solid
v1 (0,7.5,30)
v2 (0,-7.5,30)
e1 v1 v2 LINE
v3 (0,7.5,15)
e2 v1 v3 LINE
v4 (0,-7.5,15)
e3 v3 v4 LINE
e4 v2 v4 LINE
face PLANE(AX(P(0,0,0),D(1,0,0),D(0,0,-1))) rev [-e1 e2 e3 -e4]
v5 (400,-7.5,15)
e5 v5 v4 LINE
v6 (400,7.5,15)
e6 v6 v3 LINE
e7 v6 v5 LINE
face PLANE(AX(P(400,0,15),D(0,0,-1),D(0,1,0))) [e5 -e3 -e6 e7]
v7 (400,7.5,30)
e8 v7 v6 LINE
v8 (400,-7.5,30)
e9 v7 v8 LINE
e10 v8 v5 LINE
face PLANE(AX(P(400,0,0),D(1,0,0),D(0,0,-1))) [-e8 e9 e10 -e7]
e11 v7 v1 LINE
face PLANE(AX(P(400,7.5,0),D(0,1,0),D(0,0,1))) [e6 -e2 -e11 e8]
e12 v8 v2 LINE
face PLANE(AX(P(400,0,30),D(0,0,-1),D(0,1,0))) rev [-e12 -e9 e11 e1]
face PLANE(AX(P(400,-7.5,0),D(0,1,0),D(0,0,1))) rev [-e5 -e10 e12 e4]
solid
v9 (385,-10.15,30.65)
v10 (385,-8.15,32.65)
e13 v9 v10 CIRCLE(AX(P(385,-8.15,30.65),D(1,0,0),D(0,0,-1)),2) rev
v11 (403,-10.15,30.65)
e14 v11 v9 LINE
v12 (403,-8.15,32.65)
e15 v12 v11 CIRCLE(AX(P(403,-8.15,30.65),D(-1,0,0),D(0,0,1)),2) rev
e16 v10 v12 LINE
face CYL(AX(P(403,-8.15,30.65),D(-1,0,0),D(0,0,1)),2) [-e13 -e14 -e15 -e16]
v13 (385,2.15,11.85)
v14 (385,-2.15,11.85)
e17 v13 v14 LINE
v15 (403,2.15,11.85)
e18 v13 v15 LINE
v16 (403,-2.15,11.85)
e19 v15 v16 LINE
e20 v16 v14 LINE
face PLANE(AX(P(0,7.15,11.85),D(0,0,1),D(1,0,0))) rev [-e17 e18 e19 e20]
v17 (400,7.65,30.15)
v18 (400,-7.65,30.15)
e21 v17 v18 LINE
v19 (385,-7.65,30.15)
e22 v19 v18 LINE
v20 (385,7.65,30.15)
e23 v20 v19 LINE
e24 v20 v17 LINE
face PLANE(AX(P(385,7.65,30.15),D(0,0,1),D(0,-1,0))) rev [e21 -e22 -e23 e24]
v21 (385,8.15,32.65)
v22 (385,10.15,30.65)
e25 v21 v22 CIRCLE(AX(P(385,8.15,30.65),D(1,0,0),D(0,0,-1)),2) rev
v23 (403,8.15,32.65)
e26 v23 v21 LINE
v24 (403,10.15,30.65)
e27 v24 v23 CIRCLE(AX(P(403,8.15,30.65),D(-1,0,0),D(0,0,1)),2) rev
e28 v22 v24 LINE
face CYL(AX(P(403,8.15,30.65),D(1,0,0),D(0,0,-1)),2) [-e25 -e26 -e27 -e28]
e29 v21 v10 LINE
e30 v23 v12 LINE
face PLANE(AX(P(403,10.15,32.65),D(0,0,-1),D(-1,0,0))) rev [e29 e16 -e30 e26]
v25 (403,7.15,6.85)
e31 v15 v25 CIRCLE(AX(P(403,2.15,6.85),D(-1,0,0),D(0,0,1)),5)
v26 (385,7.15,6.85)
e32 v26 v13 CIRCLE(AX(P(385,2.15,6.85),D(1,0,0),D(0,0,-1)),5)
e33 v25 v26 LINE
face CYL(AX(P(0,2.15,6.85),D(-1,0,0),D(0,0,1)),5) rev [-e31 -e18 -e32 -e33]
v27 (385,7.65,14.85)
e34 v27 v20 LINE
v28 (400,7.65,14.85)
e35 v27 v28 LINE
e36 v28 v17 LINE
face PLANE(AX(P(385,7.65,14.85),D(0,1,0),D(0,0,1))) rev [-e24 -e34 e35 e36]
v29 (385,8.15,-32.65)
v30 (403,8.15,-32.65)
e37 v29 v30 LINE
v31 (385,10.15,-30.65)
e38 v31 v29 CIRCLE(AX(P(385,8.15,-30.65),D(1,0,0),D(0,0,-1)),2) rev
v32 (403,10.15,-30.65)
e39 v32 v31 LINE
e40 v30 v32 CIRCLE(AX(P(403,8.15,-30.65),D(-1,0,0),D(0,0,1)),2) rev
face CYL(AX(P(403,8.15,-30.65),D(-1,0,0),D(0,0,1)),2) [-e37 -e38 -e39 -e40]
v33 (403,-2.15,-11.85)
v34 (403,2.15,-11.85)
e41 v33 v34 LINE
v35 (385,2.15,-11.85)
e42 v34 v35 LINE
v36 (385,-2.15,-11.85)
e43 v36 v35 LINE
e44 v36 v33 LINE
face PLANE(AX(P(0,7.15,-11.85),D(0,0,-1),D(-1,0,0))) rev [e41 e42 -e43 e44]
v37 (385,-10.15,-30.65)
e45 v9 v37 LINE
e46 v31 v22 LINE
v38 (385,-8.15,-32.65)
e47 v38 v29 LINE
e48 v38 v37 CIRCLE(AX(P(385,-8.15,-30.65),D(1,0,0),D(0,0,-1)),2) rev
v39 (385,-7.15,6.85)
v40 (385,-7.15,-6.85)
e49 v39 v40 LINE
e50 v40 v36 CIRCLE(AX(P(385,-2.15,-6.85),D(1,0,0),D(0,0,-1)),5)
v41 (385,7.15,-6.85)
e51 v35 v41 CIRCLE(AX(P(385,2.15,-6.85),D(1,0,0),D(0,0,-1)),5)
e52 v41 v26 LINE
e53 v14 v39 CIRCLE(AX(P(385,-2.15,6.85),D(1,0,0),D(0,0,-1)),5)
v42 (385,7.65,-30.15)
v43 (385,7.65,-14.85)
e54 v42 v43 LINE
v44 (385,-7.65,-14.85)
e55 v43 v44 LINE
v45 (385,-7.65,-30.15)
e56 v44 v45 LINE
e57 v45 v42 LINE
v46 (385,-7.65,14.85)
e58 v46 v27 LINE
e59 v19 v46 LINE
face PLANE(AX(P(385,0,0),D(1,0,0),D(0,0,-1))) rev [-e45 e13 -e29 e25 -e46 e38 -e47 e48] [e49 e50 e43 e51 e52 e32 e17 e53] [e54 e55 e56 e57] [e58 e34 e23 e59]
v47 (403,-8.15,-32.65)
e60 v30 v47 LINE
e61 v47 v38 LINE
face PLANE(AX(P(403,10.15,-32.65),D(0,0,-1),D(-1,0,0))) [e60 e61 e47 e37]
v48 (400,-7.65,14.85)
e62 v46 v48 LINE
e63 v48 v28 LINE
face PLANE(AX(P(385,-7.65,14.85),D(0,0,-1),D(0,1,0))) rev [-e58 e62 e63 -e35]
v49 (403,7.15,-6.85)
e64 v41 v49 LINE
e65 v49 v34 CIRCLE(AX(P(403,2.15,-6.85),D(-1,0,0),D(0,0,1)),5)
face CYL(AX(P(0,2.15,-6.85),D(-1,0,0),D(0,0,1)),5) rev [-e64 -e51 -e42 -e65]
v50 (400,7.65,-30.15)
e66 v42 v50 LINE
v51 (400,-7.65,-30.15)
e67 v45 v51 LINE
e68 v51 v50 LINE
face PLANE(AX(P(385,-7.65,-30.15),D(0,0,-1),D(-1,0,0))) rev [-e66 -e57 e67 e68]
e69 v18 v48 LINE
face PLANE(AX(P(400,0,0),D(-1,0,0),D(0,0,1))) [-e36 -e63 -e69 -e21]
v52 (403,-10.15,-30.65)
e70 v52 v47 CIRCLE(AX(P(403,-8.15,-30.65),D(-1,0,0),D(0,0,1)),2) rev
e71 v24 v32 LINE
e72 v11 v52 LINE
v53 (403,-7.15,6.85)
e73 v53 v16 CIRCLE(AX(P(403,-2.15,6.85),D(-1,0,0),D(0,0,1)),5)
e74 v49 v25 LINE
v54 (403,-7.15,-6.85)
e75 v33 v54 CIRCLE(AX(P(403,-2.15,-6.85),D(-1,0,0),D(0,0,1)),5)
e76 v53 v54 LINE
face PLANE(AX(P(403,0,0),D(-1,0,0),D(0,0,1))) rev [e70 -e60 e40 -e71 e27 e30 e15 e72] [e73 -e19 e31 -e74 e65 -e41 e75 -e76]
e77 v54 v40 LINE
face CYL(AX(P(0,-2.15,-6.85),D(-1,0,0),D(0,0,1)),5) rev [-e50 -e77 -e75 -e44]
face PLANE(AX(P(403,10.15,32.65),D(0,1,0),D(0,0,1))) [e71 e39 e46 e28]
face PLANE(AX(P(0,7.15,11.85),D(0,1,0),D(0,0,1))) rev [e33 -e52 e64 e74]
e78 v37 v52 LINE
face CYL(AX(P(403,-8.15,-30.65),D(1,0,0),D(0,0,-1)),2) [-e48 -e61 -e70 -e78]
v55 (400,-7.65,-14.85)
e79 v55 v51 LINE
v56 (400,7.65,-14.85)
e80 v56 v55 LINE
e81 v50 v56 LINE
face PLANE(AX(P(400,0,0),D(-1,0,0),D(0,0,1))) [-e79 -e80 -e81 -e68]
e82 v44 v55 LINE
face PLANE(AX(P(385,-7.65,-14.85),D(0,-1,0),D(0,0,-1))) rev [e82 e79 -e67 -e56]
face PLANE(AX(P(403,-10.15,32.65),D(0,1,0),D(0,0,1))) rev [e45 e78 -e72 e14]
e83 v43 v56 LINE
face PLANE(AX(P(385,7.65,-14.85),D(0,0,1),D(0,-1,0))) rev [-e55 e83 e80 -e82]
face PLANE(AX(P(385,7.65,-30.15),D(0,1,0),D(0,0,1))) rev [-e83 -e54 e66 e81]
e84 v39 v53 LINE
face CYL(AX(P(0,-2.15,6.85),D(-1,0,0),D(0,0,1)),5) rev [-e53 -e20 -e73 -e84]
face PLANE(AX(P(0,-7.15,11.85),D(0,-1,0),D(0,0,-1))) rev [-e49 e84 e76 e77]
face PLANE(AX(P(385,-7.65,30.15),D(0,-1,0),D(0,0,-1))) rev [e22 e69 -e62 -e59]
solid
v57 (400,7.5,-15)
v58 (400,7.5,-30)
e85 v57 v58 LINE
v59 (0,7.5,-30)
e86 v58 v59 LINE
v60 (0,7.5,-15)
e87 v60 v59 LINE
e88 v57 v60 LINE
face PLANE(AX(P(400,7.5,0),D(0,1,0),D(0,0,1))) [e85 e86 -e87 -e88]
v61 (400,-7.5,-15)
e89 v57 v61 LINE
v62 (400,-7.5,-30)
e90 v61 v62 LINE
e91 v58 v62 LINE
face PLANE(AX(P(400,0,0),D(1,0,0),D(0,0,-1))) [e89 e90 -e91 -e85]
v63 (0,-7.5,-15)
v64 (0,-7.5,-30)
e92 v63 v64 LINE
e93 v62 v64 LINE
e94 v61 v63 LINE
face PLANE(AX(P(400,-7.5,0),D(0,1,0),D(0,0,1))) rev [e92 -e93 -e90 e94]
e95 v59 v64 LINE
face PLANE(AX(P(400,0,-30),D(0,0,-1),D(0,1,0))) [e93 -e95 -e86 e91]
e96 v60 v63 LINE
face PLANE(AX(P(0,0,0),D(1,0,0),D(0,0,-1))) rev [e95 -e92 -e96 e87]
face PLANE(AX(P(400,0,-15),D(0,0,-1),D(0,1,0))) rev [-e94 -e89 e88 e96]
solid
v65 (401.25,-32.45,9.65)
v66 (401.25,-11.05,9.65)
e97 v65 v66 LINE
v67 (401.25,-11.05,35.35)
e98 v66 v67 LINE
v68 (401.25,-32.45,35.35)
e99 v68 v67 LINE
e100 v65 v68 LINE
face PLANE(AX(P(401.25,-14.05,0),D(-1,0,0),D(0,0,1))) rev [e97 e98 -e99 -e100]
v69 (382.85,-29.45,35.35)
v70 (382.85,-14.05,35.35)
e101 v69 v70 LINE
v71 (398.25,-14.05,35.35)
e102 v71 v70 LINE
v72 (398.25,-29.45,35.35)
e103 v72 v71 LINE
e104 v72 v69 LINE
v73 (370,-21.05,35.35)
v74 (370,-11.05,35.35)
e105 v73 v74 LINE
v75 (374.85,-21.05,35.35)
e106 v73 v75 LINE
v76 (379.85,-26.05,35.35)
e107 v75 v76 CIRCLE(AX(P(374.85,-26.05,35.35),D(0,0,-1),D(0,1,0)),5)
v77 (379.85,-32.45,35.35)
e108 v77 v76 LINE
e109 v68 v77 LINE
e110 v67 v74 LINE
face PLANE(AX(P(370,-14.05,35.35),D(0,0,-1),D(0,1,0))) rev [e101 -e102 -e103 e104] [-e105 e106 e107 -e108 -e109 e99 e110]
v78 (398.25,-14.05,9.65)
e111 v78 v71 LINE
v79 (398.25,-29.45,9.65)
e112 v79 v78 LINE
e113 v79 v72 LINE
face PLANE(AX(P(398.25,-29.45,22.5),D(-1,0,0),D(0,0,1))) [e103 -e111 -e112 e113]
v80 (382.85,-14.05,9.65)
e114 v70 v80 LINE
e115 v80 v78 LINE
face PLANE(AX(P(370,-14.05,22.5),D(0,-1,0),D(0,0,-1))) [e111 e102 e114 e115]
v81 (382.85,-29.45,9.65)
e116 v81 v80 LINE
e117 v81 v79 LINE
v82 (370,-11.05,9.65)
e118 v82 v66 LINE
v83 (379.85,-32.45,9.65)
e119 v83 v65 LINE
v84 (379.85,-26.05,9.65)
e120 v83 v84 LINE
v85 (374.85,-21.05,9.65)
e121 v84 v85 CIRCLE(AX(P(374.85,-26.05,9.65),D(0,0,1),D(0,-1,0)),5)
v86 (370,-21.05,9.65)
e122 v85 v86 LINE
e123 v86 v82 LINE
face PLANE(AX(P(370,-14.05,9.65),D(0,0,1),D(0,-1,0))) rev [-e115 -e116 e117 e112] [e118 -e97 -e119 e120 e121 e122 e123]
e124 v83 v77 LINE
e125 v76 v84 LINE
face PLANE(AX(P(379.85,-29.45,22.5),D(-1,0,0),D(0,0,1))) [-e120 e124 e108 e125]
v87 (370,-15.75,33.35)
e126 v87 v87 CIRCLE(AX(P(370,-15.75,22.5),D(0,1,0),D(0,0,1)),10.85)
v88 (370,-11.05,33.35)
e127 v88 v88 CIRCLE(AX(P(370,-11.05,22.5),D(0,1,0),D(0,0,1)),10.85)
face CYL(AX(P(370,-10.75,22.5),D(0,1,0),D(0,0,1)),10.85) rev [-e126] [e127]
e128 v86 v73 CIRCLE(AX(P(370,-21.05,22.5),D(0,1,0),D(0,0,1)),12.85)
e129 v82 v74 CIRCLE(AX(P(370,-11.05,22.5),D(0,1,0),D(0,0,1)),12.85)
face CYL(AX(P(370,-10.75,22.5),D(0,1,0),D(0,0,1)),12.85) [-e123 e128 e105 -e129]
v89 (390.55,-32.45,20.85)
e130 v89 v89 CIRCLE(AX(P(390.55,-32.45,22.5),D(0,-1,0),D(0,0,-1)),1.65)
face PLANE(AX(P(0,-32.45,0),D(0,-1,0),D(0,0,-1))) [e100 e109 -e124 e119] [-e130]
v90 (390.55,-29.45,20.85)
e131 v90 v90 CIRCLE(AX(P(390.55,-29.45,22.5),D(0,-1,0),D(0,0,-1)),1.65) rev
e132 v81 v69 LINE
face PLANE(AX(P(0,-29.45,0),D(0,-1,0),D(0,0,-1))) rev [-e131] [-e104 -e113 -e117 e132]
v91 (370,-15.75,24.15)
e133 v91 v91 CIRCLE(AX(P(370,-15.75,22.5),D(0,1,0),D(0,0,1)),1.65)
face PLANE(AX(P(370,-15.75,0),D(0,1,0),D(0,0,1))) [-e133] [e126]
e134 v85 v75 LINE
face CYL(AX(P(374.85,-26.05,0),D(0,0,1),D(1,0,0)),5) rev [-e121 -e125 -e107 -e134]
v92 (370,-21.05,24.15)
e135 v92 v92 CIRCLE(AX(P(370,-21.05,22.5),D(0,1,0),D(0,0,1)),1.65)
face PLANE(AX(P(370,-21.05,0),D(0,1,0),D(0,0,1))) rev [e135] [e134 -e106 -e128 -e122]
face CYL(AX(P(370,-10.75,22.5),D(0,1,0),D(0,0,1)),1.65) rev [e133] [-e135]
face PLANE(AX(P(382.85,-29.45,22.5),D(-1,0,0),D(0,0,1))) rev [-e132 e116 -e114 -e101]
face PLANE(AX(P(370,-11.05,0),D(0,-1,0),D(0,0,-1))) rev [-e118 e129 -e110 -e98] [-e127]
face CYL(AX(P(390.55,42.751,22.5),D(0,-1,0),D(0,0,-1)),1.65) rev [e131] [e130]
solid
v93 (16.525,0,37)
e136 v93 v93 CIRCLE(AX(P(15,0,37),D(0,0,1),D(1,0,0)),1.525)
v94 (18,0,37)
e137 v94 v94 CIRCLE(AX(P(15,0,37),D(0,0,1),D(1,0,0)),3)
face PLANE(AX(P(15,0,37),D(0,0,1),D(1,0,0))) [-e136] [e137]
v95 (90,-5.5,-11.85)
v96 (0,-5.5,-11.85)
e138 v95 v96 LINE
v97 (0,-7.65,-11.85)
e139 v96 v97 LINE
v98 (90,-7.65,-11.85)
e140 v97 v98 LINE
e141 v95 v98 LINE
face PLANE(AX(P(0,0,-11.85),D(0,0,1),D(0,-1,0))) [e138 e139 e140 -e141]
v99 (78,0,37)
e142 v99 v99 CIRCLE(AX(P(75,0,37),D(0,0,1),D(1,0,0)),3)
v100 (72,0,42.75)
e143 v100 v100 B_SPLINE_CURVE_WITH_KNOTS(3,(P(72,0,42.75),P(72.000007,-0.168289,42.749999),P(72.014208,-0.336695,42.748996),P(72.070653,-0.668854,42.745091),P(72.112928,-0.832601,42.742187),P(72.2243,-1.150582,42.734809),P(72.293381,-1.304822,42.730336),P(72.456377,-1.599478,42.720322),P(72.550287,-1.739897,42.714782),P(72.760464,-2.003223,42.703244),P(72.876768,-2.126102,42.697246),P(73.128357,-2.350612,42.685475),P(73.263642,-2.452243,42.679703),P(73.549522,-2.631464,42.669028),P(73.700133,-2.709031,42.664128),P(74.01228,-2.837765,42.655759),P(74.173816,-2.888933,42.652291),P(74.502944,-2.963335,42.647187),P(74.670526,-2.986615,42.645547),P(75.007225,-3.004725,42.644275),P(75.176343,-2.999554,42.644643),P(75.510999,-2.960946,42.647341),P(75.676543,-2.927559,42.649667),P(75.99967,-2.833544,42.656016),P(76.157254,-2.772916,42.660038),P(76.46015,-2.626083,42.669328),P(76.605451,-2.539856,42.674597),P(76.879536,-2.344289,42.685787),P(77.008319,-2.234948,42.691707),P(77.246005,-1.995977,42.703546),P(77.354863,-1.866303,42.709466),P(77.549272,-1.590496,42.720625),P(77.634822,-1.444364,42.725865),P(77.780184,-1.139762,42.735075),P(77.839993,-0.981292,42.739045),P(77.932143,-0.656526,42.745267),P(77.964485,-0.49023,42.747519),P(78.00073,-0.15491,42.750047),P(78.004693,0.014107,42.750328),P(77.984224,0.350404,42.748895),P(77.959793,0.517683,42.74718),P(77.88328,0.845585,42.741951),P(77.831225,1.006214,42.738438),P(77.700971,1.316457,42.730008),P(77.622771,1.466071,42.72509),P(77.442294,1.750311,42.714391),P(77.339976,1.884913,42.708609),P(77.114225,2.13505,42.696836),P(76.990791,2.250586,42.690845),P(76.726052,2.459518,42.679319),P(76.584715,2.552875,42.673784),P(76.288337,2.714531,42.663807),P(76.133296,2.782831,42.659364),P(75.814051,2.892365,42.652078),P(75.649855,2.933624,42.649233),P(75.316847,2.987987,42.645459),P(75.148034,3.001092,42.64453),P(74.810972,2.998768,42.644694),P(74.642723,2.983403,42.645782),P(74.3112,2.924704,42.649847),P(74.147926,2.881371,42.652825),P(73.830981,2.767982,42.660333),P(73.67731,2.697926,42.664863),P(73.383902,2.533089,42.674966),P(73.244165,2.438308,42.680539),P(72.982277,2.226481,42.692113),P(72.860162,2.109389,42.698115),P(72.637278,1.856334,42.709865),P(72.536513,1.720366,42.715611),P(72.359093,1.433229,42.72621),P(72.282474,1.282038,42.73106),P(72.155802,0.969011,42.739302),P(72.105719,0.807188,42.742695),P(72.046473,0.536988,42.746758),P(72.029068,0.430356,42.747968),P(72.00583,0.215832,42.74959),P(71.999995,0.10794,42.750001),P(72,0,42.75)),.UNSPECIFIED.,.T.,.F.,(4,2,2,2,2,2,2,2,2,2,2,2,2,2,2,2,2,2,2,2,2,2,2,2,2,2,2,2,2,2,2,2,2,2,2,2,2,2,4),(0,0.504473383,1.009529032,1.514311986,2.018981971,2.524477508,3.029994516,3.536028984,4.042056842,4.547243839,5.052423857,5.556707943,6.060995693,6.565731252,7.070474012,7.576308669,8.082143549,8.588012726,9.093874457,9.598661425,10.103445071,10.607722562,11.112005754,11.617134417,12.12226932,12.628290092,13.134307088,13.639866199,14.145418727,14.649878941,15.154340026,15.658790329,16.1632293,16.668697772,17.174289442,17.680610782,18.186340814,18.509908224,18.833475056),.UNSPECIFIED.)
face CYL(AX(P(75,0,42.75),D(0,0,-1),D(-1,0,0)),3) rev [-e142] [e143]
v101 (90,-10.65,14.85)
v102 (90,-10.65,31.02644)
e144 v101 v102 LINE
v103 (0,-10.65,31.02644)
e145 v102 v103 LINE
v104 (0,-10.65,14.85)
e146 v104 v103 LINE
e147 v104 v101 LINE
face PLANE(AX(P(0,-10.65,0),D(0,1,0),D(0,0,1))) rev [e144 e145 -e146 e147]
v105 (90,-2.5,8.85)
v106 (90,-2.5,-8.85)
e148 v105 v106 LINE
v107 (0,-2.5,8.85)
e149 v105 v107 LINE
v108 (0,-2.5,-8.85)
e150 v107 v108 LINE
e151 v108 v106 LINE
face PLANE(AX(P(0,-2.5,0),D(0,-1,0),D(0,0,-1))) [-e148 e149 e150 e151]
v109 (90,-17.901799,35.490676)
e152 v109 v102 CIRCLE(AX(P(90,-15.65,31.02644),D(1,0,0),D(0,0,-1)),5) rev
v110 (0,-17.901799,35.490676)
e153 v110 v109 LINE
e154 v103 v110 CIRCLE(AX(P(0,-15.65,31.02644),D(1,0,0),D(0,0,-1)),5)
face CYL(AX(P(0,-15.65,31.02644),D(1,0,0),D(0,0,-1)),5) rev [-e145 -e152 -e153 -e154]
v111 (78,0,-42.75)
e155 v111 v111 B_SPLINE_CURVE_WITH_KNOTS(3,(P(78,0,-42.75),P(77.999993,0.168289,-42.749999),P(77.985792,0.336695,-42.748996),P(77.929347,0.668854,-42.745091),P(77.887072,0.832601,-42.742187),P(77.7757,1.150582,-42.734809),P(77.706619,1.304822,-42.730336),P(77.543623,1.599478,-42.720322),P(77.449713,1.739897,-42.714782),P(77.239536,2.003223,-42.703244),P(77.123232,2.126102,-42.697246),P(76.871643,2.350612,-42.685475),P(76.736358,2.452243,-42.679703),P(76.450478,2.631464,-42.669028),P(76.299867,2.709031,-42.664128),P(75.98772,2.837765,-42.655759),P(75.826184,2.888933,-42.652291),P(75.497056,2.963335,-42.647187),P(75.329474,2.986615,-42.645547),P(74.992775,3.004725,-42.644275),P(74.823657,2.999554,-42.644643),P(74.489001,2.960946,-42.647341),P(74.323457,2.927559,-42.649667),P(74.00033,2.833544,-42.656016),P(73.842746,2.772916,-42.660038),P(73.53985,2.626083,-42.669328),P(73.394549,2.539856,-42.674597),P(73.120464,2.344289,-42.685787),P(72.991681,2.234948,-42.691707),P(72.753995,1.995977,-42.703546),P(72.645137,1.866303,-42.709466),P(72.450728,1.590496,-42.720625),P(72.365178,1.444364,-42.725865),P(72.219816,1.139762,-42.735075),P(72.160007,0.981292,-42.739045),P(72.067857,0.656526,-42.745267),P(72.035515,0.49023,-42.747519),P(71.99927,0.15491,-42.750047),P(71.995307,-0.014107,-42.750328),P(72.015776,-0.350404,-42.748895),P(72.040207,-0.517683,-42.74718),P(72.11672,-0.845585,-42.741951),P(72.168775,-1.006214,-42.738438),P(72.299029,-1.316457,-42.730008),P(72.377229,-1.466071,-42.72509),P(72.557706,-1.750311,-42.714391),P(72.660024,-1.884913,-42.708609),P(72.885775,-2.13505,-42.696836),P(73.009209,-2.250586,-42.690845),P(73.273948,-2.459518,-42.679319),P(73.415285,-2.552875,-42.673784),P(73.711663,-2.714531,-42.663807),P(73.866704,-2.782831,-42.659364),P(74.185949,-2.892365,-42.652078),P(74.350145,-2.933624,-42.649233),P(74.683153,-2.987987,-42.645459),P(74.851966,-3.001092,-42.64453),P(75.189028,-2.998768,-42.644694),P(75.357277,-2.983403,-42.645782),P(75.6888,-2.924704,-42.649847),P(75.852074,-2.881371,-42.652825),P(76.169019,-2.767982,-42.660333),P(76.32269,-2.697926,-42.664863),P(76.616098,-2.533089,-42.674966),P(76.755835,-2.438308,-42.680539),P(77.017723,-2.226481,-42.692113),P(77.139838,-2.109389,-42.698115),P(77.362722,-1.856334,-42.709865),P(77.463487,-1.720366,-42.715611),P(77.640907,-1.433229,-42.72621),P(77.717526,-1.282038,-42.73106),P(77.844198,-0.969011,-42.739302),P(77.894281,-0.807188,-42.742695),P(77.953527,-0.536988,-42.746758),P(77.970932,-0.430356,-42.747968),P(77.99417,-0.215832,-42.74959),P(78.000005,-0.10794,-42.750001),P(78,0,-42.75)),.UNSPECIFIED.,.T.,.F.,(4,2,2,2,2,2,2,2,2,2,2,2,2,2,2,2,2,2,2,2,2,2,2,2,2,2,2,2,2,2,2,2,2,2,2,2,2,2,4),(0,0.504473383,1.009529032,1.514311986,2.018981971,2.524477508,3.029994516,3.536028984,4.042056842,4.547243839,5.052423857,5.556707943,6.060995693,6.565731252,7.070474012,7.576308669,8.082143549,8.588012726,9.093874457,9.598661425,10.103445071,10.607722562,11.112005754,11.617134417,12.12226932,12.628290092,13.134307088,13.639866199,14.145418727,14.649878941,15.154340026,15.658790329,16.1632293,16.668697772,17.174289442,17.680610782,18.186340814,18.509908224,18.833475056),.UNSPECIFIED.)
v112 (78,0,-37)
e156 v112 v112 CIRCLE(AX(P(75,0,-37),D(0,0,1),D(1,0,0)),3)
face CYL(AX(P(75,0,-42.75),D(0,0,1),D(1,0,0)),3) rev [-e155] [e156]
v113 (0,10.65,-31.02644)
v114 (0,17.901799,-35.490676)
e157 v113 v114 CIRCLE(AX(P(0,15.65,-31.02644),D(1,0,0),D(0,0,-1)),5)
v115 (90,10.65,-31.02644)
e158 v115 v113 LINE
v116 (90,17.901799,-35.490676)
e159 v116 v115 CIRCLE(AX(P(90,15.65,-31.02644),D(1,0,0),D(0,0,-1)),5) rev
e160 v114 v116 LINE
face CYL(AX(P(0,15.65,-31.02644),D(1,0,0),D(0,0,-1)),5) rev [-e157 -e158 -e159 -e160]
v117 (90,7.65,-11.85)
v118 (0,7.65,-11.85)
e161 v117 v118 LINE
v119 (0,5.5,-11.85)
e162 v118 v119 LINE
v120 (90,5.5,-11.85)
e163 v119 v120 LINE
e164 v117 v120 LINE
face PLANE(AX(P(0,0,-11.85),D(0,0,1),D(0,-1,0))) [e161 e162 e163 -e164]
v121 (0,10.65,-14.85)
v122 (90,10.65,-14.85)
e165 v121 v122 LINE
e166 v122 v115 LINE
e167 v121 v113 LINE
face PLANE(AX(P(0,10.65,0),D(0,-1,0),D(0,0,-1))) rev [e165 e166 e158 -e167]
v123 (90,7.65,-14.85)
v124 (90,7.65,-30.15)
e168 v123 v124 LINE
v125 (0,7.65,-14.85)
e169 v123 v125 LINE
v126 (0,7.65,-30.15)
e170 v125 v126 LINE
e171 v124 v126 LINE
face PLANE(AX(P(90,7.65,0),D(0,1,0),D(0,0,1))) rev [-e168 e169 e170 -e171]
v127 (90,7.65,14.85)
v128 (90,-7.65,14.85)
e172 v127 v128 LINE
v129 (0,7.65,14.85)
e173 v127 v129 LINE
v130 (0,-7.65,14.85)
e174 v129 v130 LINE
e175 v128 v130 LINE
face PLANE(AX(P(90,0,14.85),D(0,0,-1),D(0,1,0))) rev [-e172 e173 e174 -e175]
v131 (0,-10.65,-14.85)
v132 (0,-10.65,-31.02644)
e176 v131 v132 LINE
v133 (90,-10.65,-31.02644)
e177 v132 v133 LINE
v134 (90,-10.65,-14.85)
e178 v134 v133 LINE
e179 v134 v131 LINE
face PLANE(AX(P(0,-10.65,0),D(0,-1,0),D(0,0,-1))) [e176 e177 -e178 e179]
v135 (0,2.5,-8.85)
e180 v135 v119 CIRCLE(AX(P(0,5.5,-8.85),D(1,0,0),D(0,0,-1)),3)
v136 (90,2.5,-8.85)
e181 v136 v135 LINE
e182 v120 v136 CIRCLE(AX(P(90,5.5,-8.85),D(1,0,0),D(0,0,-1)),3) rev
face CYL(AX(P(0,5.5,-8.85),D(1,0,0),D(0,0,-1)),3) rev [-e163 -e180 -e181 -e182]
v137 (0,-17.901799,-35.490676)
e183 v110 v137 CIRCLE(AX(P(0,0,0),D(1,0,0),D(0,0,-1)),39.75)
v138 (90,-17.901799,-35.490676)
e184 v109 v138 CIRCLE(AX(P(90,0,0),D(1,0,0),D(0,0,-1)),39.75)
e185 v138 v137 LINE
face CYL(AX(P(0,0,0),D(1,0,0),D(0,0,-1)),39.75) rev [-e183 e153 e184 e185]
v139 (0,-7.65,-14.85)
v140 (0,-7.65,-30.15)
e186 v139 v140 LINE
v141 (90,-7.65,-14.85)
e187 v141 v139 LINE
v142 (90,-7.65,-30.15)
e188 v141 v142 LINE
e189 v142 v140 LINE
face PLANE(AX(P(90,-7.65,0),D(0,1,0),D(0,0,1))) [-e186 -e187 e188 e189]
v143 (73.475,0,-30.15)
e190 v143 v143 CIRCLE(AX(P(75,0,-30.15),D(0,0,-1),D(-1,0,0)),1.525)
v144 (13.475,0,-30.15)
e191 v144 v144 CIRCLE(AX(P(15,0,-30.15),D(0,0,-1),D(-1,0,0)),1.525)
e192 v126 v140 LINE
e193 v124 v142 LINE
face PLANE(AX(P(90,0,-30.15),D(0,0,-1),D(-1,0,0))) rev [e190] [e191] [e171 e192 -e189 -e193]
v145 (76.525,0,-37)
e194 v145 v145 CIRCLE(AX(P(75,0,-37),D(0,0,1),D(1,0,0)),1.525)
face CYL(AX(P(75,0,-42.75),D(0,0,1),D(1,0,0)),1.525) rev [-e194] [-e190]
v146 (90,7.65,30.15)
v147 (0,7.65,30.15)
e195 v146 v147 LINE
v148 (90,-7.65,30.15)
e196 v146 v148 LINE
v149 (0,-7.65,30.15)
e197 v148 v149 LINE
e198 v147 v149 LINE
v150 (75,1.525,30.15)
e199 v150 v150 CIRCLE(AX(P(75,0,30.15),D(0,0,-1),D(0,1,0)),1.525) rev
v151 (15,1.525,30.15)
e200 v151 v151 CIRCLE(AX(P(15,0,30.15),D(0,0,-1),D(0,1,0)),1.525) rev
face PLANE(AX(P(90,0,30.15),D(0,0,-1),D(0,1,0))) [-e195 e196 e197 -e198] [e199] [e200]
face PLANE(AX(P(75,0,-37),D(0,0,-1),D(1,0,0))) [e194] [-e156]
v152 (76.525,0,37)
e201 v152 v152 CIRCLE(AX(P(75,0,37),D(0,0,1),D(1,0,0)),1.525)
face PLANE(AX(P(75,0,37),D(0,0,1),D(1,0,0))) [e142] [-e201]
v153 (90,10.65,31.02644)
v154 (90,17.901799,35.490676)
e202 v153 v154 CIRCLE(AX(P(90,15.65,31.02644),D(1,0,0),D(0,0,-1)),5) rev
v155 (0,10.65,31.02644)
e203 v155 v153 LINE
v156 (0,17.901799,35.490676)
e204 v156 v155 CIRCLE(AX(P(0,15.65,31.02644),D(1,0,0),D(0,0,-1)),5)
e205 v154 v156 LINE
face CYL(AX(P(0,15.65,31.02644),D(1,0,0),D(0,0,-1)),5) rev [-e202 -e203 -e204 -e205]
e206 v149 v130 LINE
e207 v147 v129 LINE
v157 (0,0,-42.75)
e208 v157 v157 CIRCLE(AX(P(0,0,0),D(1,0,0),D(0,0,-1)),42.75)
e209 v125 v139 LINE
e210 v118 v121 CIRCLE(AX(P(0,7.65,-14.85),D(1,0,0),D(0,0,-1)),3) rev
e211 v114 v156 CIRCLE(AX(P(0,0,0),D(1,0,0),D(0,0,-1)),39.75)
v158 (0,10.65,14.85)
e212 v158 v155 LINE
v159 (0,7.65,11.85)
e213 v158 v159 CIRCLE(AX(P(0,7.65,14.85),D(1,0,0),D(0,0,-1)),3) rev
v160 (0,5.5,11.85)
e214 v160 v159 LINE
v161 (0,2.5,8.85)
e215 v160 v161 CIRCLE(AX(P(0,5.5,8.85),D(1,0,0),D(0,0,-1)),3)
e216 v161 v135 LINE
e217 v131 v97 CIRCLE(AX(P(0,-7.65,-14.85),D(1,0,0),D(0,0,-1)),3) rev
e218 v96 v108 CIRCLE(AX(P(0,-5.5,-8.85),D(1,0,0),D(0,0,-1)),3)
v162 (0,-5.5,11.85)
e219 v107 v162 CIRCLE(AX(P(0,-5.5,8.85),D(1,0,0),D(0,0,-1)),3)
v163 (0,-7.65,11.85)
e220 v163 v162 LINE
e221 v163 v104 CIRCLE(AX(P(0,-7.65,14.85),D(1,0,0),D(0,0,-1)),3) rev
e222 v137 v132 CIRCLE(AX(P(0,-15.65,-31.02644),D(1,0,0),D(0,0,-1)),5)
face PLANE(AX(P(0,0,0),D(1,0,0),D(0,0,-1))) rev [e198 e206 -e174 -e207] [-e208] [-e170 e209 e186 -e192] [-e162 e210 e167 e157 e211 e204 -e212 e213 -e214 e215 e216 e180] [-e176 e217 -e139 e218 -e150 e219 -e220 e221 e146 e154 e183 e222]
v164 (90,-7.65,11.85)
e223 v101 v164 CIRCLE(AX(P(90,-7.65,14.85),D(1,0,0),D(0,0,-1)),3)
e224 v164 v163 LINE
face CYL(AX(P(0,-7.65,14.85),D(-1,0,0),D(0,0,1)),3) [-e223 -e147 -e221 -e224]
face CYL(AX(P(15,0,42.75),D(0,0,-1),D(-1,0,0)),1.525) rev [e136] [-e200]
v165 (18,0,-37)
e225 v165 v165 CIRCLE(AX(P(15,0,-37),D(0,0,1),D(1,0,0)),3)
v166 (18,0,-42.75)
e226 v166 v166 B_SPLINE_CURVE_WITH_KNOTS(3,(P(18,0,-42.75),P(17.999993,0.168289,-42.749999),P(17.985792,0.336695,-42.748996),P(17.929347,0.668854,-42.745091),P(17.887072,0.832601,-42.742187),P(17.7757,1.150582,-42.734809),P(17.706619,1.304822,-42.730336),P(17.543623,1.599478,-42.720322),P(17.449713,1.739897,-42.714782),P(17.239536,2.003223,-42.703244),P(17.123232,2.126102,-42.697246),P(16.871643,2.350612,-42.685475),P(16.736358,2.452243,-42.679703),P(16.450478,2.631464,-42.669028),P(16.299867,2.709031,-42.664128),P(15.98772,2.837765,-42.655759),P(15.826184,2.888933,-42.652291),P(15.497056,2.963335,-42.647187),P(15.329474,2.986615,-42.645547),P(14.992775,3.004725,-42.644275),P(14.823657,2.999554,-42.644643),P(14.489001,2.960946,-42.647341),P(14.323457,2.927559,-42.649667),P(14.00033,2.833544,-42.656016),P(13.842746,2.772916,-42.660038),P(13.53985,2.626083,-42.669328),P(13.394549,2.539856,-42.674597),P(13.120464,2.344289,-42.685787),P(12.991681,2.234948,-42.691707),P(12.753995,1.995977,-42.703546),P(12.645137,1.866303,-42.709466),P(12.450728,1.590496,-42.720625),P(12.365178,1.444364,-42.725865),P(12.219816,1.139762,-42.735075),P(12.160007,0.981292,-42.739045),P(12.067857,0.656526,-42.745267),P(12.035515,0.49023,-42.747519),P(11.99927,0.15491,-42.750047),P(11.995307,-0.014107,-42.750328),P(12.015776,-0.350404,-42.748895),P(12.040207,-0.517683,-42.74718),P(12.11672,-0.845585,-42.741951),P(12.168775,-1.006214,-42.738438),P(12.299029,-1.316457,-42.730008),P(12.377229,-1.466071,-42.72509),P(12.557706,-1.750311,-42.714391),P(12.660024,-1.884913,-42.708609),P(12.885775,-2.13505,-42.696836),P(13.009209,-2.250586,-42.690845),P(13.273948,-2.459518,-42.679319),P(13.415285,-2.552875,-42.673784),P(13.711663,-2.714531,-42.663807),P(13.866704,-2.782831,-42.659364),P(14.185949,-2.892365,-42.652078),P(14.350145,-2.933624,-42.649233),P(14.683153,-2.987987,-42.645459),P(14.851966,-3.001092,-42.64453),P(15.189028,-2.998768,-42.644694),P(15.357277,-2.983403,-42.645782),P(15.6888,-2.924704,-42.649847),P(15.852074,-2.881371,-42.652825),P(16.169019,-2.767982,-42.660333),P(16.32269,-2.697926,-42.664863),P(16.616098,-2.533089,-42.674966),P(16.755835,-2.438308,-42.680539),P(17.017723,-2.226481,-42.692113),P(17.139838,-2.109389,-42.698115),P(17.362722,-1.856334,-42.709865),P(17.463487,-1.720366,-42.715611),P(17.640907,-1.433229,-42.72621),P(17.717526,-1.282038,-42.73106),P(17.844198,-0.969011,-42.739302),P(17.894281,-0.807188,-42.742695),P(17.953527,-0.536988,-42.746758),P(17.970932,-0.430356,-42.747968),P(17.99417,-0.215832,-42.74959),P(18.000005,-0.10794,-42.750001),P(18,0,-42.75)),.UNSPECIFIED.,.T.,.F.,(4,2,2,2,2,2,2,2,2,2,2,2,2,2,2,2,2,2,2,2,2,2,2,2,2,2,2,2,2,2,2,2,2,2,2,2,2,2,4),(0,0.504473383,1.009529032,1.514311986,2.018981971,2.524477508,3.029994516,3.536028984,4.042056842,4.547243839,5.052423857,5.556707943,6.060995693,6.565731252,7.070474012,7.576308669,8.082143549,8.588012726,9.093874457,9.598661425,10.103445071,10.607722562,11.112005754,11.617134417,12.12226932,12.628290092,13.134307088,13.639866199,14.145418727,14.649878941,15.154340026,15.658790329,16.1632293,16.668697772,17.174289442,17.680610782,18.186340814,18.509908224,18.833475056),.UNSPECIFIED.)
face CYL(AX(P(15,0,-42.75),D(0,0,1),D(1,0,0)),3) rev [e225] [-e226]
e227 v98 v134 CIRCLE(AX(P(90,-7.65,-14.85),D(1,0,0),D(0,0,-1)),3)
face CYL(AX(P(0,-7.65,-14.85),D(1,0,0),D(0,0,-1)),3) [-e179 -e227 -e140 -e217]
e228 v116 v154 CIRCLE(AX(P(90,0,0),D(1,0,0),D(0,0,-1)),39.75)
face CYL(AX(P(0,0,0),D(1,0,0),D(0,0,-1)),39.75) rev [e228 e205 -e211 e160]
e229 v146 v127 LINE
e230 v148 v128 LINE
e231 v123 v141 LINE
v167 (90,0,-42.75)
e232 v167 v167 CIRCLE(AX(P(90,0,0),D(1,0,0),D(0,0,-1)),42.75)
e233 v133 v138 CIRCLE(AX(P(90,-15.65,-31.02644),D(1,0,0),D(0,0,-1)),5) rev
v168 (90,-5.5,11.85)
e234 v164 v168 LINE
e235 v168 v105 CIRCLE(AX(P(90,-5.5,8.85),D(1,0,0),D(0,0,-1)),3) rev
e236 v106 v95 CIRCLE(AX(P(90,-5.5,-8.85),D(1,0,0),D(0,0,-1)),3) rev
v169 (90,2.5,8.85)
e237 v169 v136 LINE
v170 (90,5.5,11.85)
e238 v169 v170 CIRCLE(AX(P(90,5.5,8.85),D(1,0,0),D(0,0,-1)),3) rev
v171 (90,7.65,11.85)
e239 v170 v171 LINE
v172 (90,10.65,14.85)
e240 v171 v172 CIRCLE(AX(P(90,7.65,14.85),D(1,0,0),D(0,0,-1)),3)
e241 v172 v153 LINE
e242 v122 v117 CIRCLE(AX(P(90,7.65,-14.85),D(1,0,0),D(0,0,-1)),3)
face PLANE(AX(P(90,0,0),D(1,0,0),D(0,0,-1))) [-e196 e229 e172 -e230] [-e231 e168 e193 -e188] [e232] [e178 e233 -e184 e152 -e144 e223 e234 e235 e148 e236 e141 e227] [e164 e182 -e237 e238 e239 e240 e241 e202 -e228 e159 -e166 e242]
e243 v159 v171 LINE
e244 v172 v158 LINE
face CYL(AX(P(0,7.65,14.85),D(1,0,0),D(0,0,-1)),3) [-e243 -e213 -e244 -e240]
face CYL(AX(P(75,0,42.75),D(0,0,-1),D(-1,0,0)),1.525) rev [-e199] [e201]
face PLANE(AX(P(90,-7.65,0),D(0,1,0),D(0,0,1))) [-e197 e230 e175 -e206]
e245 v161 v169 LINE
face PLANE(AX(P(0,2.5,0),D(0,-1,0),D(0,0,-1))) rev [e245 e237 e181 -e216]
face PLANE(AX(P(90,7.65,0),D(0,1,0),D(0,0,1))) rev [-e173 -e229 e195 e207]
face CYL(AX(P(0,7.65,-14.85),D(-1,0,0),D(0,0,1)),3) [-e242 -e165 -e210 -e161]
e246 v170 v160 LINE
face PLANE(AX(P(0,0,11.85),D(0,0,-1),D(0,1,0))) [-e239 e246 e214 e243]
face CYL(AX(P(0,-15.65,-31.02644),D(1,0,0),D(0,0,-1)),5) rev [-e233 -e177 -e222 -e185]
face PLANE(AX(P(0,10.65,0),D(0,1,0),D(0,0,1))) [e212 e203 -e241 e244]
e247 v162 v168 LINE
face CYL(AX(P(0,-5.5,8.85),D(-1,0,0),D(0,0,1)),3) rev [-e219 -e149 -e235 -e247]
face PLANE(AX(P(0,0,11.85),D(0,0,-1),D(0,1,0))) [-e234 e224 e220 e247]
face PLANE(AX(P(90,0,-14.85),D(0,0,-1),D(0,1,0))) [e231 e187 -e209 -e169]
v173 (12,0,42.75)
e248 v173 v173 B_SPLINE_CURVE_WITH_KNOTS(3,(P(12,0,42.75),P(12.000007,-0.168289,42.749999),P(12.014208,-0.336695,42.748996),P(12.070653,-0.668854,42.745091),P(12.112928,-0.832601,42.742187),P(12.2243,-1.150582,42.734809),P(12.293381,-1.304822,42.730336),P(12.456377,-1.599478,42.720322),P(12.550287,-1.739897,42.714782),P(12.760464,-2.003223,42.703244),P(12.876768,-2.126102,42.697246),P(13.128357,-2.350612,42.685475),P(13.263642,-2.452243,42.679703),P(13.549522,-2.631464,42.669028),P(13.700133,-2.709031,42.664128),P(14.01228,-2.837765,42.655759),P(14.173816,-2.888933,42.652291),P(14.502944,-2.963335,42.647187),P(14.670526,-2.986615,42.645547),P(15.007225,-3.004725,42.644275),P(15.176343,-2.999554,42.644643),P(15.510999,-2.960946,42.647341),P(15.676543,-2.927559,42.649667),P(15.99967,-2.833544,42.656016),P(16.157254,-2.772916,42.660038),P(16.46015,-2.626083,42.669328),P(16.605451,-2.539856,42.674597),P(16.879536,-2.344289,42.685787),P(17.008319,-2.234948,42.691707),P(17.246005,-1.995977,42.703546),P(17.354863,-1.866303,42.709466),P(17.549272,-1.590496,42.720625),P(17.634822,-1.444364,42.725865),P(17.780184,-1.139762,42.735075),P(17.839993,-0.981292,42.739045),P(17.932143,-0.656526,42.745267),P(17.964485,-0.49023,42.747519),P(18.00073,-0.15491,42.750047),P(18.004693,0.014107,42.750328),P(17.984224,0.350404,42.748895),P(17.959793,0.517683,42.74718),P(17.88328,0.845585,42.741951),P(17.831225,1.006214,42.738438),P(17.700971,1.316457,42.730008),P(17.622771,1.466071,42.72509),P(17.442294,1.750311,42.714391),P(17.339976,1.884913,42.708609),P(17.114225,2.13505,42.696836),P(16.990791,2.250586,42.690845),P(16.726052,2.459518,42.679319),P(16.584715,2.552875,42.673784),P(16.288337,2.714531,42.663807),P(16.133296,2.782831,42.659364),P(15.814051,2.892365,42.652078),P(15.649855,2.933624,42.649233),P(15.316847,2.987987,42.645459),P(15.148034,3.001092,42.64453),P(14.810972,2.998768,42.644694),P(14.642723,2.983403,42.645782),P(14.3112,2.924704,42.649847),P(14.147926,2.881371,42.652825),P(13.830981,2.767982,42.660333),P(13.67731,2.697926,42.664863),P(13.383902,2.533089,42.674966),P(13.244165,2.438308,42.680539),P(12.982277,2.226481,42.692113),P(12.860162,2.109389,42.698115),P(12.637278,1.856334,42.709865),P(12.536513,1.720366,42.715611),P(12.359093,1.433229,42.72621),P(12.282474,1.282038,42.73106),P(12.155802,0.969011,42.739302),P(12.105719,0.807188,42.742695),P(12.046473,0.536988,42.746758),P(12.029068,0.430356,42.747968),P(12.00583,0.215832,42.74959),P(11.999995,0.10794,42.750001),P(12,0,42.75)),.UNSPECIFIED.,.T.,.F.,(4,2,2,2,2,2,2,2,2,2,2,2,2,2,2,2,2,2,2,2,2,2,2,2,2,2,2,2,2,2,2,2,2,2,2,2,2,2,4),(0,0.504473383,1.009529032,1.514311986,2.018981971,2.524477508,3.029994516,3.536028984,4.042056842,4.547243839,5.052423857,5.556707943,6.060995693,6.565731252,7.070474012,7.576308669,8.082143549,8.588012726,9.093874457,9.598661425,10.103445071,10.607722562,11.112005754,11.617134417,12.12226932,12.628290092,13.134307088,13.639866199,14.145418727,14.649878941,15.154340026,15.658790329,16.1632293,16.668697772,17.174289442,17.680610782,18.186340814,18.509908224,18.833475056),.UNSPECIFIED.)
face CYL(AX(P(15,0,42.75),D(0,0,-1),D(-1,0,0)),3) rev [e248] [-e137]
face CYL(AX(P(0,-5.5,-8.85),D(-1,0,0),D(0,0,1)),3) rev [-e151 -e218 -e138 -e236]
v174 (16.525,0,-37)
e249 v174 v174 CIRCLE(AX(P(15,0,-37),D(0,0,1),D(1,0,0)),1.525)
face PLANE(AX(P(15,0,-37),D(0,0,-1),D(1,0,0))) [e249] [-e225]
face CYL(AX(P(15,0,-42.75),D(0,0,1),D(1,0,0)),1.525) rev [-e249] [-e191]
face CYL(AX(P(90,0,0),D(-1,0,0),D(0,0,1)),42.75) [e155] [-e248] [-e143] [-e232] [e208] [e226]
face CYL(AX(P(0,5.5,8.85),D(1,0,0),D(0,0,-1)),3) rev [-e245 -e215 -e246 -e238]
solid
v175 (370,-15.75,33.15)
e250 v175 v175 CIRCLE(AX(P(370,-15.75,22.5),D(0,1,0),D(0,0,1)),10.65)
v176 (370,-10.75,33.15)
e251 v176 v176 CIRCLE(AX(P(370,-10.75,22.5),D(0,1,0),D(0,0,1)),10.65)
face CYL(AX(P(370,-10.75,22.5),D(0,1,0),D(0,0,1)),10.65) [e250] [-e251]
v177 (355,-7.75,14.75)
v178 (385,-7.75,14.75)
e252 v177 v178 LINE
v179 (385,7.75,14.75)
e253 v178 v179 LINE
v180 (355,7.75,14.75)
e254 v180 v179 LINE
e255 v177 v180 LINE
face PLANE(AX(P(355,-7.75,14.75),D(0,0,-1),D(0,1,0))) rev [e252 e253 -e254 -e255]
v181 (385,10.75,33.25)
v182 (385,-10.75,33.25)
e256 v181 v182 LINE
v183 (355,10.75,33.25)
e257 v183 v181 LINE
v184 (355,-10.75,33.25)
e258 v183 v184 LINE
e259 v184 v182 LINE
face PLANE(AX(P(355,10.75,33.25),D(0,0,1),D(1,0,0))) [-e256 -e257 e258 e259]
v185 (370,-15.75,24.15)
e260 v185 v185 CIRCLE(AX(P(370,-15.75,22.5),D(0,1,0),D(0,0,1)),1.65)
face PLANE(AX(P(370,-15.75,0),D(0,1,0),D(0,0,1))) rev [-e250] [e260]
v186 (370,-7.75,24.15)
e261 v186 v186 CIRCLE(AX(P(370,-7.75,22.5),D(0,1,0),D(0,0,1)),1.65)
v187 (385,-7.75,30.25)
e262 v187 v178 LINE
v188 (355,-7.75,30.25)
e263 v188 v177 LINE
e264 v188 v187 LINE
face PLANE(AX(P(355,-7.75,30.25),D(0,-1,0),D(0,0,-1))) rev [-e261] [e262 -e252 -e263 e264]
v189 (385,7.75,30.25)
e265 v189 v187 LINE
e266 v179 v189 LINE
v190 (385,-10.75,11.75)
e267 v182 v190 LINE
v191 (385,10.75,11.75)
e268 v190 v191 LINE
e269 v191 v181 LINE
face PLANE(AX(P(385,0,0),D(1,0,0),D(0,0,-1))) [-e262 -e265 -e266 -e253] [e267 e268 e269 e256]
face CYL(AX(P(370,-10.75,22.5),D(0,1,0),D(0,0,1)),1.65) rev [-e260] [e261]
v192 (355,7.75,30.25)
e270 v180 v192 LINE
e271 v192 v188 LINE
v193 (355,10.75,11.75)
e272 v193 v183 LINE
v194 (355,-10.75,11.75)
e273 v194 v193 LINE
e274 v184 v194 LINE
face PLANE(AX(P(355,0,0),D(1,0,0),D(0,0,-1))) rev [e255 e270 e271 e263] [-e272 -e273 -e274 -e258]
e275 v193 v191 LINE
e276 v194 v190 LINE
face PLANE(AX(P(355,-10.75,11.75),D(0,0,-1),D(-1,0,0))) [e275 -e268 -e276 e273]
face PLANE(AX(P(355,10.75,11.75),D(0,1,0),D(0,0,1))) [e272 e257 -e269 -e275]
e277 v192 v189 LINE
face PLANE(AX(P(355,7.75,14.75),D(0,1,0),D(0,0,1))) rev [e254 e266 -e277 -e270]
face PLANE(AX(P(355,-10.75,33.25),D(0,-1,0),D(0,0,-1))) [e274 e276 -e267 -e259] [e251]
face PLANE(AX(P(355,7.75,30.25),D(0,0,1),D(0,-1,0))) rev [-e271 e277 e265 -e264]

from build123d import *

# Parameters (mm, degrees)
SKETCH1_R                = 42.75
SKETCH1_W                = 15.3
SKETCH1_H                = 15.3
BOSS_EXTRUDE1_DEPTH      = 90
CUT_EXTRUDE2_START       = 30
SKETCH2_R                = 1.525
CUT_EXTRUDE2_DEPTH       = 79.421054228
CUT_EXTRUDE3_START       = 37
SKETCH2_3_R              = 3
SKETCH2_3_R_2            = 1.525
CUT_EXTRUDE3_DEPTH       = 72.42105439
CUT_EXTRUDE4_DEPTH       = 109.42105439
FILLET1_R                = 3
SKETCH1_3_W              = 15
SKETCH1_3_H              = 15
BOSS_EXTRUDE2_DEPTH      = 400
BOSS_EXTRUDE2_2_DEPTH    = 400
SKETCH4_W                = 65.3
SKETCH4_H                = 20.3
BOSS_EXTRUDE3_DEPTH      = 3
SKETCH4_3_W              = 65.3
SKETCH4_3_H              = 20.3
SKETCH4_3_W_2            = 15.3
SKETCH4_3_H_2            = 15.3
BOSS_EXTRUDE4_DEPTH      = 15
SKETCH5_W                = 23.7
SKETCH5_H                = 14.3
CUT_EXTRUDE5_DEPTH       = 408.509662582
FILLET2_R                = 5
FILLET3_R                = 2
BOSS_EXTRUDE5_START      = -15
SKETCH6_W                = 21.5
SKETCH6_H                = 21.5
SKETCH6_W_2              = 15.5
SKETCH6_H_2              = 15.5
BOSS_EXTRUDE5_DEPTH      = 30
SKETCH9_W                = 1.65
SKETCH9_H                = 3
SKETCH9_4_W              = 9
SKETCH9_4_H              = 5
FILLET4_R                = 5
BOSS_EXTRUDE6_START      = 0.3
BOSS_EXTRUDE6_DEPTH      = 3
BOSS_EXTRUDE8_START      = 3.3
BOSS_EXTRUDE8_OUTLINE_W  = 3
BOSS_EXTRUDE8_OUTLINE_H  = 25.7
BOSS_EXTRUDE8_DEPTH      = 15.4
BOSS_EXTRUDE9_START      = 3.3
BOSS_EXTRUDE9_DEPTH      = 7
BOSS_EXTRUDE10_START     = 18.7
BOSS_EXTRUDE10_OUTLINE_W = 21.4
BOSS_EXTRUDE10_OUTLINE_H = 25.7
BOSS_EXTRUDE10_DEPTH     = 3
FILLET5_R                = 5
SKETCH12_R               = 1.65
CUT_EXTRUDE6_DEPTH       = 3
CUT_EXTRUDE7_DEPTH       = 1.7


# Read off the part's stored shape, not the designer's step: Boss-Extrude8, Boss-Extrude10
with BuildPart() as part:
    # Sketch1 → Boss-Extrude1 (new body)
    with BuildSketch(Plane(origin=(0, 0, 0), x_dir=(0, 0, -1), z_dir=(1, 0, 0))):
        with Locations(Location((0, 0, 0), (0, 0, 180))):
            Circle(SKETCH1_R)
        with Locations((22.5, 0)):
            Rectangle(SKETCH1_W, SKETCH1_H, mode=Mode.SUBTRACT)
        with Locations((-22.5, 0)):
            Rectangle(SKETCH1_W, SKETCH1_H, mode=Mode.SUBTRACT)
    extrude(amount=BOSS_EXTRUDE1_DEPTH)

    # Sketch2 → Cut-Extrude2 (cut, through all)
    with BuildSketch(Plane.XY.offset(CUT_EXTRUDE2_START)):
        with Locations(Location((15, 0, 0), (0, 0, 180))):
            Circle(SKETCH2_R)
        with Locations(Location((75, 0, 0), (0, 0, 180))):
            Circle(SKETCH2_R)
    cut_extrude2 = extrude(amount=CUT_EXTRUDE2_DEPTH, mode=Mode.SUBTRACT)

    # Sketch2<3> → Cut-Extrude3 (cut, through all)
    # profile 1 of 2: a face of its own
    with BuildSketch(Plane.XY.offset(CUT_EXTRUDE3_START)):
        with Locations(Location((15, 0, 0), (0, 0, 180))):
            Circle(SKETCH2_3_R)
        with Locations(Location((15, 0, 0), (0, 0, 90))):
            Circle(SKETCH2_3_R_2, mode=Mode.SUBTRACT)
    # profile 2 of 2: a face of its own
    with BuildSketch(Plane.XY.offset(CUT_EXTRUDE3_START)):
        with Locations(Location((75, 0, 0), (0, 0, 180))):
            Circle(SKETCH2_3_R)
        with Locations(Location((75, 0, 0), (0, 0, 90))):
            Circle(SKETCH2_3_R_2, mode=Mode.SUBTRACT)
    cut_extrude3 = extrude(amount=CUT_EXTRUDE3_DEPTH, mode=Mode.SUBTRACT)

    # Mirror1: Cut-Extrude2, Cut-Extrude3 across plane
    add(cut_extrude2.mirror(Plane.XY), mode=Mode.SUBTRACT)
    add(cut_extrude3.mirror(Plane.XY), mode=Mode.SUBTRACT)

    # Sketch3 → Cut-Extrude4 (cut, through all)
    with BuildSketch(Plane(origin=(90, 0, 0), x_dir=(0, 0, -1), z_dir=(1, 0, 0))):
        with BuildLine():
            Line((-38.296736153, 10.65), (-33.15, 10.65))
            Line((-33.15, 10.65), (-11.85, 10.65))
            Line((-11.85, 10.65), (-11.85, 2.5))
            Line((-11.85, 2.5), (11.85, 2.5))
            Line((11.85, 2.5), (11.85, 10.65))
            Line((11.85, 10.65), (33.15, 10.65))
            Line((33.15, 10.65), (38.296736153, 10.65))
            ThreePointArc((38.296736153, 10.65), (0, 39.75), (-38.296736153, 10.65))
        make_face()
        with BuildLine():
            Line((-11.85, -10.65), (-33.15, -10.65))
            Line((-33.15, -10.65), (-38.296736153, -10.65))
            ThreePointArc((-38.296736153, -10.65), (0, -39.75), (38.296736153, -10.65))
            Line((38.296736153, -10.65), (33.15, -10.65))
            Line((33.15, -10.65), (11.85, -10.65))
            Line((11.85, -10.65), (11.85, -2.5))
            Line((11.85, -2.5), (-11.85, -2.5))
            Line((-11.85, -2.5), (-11.85, -10.65))
        make_face()
    extrude(amount=-CUT_EXTRUDE4_DEPTH, mode=Mode.SUBTRACT)

    # Fillet1
    fillet1_edges = [part.edges().sort_by_distance(p)[0] for p in [
        (45, 10.65, -11.85),
        (45, 2.5, -11.85),
        (45, 2.5, 11.85),
        (45, 10.65, 11.85),
        (45, -10.65, 11.85),
        (45, -2.5, 11.85),
        (45, -2.5, -11.85),
        (45, -10.65, -11.85),
    ]]
    fillet(fillet1_edges, radius=FILLET1_R)

    # Fillet4
    fillet4_edges = [part.edges().sort_by_distance(p)[0] for p in [
        (45, 10.65, -38.296736153),
        (45, 10.65, 38.296736153),
        (45, -10.65, 38.296736153),
        (45, -10.65, -38.296736153),
    ]]
    fillet(fillet4_edges, radius=FILLET4_R)


with BuildPart() as body_2:
    # Sketch1<3> → Boss-Extrude2 (new body)
    with BuildSketch(Plane(origin=(0, 0, 0), x_dir=(0, 0, -1), z_dir=(1, 0, 0))):
        with Locations((-22.5, 0)):
            Rectangle(SKETCH1_3_W, SKETCH1_3_H)
    extrude(amount=BOSS_EXTRUDE2_DEPTH)


with BuildPart() as body_3:
    # Sketch1<3> → Boss-Extrude2 2 (new body)
    with BuildSketch(Plane(origin=(0, 0, 0), x_dir=(0, 0, -1), z_dir=(1, 0, 0))):
        with Locations((22.5, 0)):
            Rectangle(SKETCH1_3_W, SKETCH1_3_H)
    extrude(amount=BOSS_EXTRUDE2_2_DEPTH)


with BuildPart() as body_4:
    # Sketch4 → Boss-Extrude3 (new body)
    with BuildSketch(Plane(origin=(400, 0, 0), x_dir=(0, 0, -1), z_dir=(1, 0, 0))):
        Rectangle(SKETCH4_W, SKETCH4_H)
    extrude(amount=BOSS_EXTRUDE3_DEPTH)

    # Sketch4<3> → Boss-Extrude4 (add)
    with BuildSketch(Plane(origin=(400, 0, 0), x_dir=(0, 0, -1), z_dir=(1, 0, 0))):
        Rectangle(SKETCH4_3_W, SKETCH4_3_H)
        with Locations((-22.5, 0)):
            Rectangle(SKETCH4_3_W_2, SKETCH4_3_H_2, mode=Mode.SUBTRACT)
        with Locations((22.5, 0)):
            Rectangle(SKETCH4_3_W_2, SKETCH4_3_H_2, mode=Mode.SUBTRACT)
    extrude(amount=-BOSS_EXTRUDE4_DEPTH)

    # Sketch5 → Cut-Extrude5 (cut, through all)
    with BuildSketch(Plane(origin=(403, 0, 0), x_dir=(0, 0, -1), z_dir=(1, 0, 0))):
        Rectangle(SKETCH5_W, SKETCH5_H)
    extrude(amount=-CUT_EXTRUDE5_DEPTH, mode=Mode.SUBTRACT)

    # Fillet2
    fillet2_edges = [body_4.edges().sort_by_distance(p)[0] for p in [
        (394, 7.15, -11.85),
        (394, -7.15, -11.85),
        (394, -7.15, 11.85),
        (394, 7.15, 11.85),
    ]]
    fillet(fillet2_edges, radius=FILLET2_R)

    # Fillet3
    fillet3_edges = [body_4.edges().sort_by_distance(p)[0] for p in [
        (394, 10.15, 32.65),
        (394, -10.15, 32.65),
        (394, -10.15, -32.65),
        (394, 10.15, -32.65),
    ]]
    fillet(fillet3_edges, radius=FILLET3_R)


with BuildPart() as body_5:
    # Sketch6 → Boss-Extrude5 (new body)
    with BuildSketch(Plane(origin=(400, 0, 0), x_dir=(0, 0, -1), z_dir=(1, 0, 0)).offset(BOSS_EXTRUDE5_START)):
        with Locations((-22.5, 0)):
            Rectangle(SKETCH6_W, SKETCH6_H)
        with Locations((-22.5, 0)):
            Rectangle(SKETCH6_W_2, SKETCH6_H_2, mode=Mode.SUBTRACT)
    extrude(amount=-BOSS_EXTRUDE5_DEPTH)

    # Sketch9 → Cut-Revolve1 (revolve, cut)
    with BuildSketch(Plane(origin=(370, 0, 0), x_dir=(0, 0, -1), z_dir=(1, 0, 0))):
        with Locations((-23.325, -9.25)):
            Rectangle(SKETCH9_W, SKETCH9_H)
    revolve(axis=Axis((370, -10.75, 22.5), (0, -1, 0)), mode=Mode.SUBTRACT)

    # Sketch9<4> → Revolve1 (revolve)
    with BuildSketch(Plane(origin=(370, 0, 0), x_dir=(0, 0, -1), z_dir=(1, 0, 0))):
        with Locations((-28.65, -13.25)):
            Rectangle(SKETCH9_4_W, SKETCH9_4_H)
    revolve(axis=Axis((370, -10.75, 22.5), (0, -1, 0)))


with BuildPart() as body_6:
    # Sketch9<5> → Revolve2 (revolve)
    with BuildSketch(Plane(origin=(370, 0, 0), x_dir=(0, 0, -1), z_dir=(1, 0, 0))):
        Polygon((-24.15, -21.05), (-24.15, -15.75), (-33.15, -15.75), (-33.35, -15.75), (-33.35, -11.05), (-35.35, -11.05), (-35.35, -21.05), align=None)
    revolve(axis=Axis((370, -10.75, 22.5), (0, -1, 0)))

    # Sketch11 → Boss-Extrude6 (add)
    with BuildSketch(Plane.XZ.offset(10.75).offset(BOSS_EXTRUDE6_START)):
        with BuildLine():
            Line((401.25, 9.65), (401.25, 35.35))
            Line((401.25, 35.35), (370, 35.35))
            ThreePointArc((370, 35.35), (382.85, 22.5), (370, 9.65))
            Line((370, 9.65), (401.25, 9.65))
        make_face()
    extrude(amount=BOSS_EXTRUDE6_DEPTH)

    # Boss-Extrude8 outline → Boss-Extrude8 (add)
    with BuildSketch(Plane.XZ.offset(10.75).offset(BOSS_EXTRUDE8_START)):
        with Locations((399.75, 22.5)):
            Rectangle(BOSS_EXTRUDE8_OUTLINE_W, BOSS_EXTRUDE8_OUTLINE_H)
        with Locations((381.35, 22.5)):
            Rectangle(BOSS_EXTRUDE8_OUTLINE_W, BOSS_EXTRUDE8_OUTLINE_H)
    extrude(amount=BOSS_EXTRUDE8_DEPTH)

    # Sketch11<5> → Boss-Extrude9 (add)
    with BuildSketch(Plane.XZ.offset(10.75).offset(BOSS_EXTRUDE9_START)):
        with BuildLine():
            Line((379.85, 33.25), (379.85, 35.35))
            Line((379.85, 35.35), (370, 35.35))
            ThreePointArc((370, 35.35), (373.673213852, 34.813813382), (377.039886363, 33.25))
            Line((377.039886363, 33.25), (379.85, 33.25))
        make_face()
        with BuildLine():
            Line((370, 9.65), (379.85, 9.65))
            Line((379.85, 9.65), (379.85, 11.75))
            Line((379.85, 11.75), (377.039886363, 11.75))
            ThreePointArc((377.039886363, 11.75), (373.673213852, 10.186186618), (370, 9.65))
        make_face()
        with BuildLine():
            Line((379.85, 11.75), (379.85, 14.247727586))
            ThreePointArc((379.85, 14.247727586), (378.536786638, 12.895533649), (377.039886363, 11.75))
            Line((377.039886363, 11.75), (379.85, 11.75))
        make_face()
        with BuildLine():
            Line((379.85, 30.752272414), (379.85, 33.25))
            Line((379.85, 33.25), (377.039886363, 33.25))
            ThreePointArc((377.039886363, 33.25), (378.536786638, 32.104466351), (379.85, 30.752272414))
        make_face()
    extrude(amount=BOSS_EXTRUDE9_DEPTH)

    # Boss-Extrude10 outline → Boss-Extrude10 (add)
    with BuildSketch(Plane.XZ.offset(10.75).offset(BOSS_EXTRUDE10_START)):
        with Locations((390.55, 22.5)):
            Rectangle(BOSS_EXTRUDE10_OUTLINE_W, BOSS_EXTRUDE10_OUTLINE_H)
    extrude(amount=BOSS_EXTRUDE10_DEPTH)

    # Fillet5
    fillet5_edges = [body_6.edges().sort_by_distance(p)[0] for p in [
        (379.85, -21.05, 22.5),
    ]]
    fillet(fillet5_edges, radius=FILLET5_R)

    # Sketch12 → Cut-Extrude6 (cut)
    with BuildSketch(Plane.XZ.offset(32.45)):
        with Locations(Location((390.55, 22.5, 0), (0, 0, 270))):
            Circle(SKETCH12_R)
    extrude(amount=-CUT_EXTRUDE6_DEPTH, mode=Mode.SUBTRACT)

    # Sketch13 → Cut-Extrude7 (cut)
    with BuildSketch(Plane(origin=(0, -14.05, 0), x_dir=(1, 0, 0), z_dir=(0, 1, 0))):
        with BuildLine():
            Line((379.85, -17.950274734), (379.85, -27.049725266))
            ThreePointArc((379.85, -27.049725266), (380.85, -22.5), (379.85, -17.950274734))
        make_face()
    extrude(amount=-CUT_EXTRUDE7_DEPTH, mode=Mode.SUBTRACT)


solid = Compound([part.part, body_2.part, body_3.part, body_4.part, body_5.part, body_6.part])
